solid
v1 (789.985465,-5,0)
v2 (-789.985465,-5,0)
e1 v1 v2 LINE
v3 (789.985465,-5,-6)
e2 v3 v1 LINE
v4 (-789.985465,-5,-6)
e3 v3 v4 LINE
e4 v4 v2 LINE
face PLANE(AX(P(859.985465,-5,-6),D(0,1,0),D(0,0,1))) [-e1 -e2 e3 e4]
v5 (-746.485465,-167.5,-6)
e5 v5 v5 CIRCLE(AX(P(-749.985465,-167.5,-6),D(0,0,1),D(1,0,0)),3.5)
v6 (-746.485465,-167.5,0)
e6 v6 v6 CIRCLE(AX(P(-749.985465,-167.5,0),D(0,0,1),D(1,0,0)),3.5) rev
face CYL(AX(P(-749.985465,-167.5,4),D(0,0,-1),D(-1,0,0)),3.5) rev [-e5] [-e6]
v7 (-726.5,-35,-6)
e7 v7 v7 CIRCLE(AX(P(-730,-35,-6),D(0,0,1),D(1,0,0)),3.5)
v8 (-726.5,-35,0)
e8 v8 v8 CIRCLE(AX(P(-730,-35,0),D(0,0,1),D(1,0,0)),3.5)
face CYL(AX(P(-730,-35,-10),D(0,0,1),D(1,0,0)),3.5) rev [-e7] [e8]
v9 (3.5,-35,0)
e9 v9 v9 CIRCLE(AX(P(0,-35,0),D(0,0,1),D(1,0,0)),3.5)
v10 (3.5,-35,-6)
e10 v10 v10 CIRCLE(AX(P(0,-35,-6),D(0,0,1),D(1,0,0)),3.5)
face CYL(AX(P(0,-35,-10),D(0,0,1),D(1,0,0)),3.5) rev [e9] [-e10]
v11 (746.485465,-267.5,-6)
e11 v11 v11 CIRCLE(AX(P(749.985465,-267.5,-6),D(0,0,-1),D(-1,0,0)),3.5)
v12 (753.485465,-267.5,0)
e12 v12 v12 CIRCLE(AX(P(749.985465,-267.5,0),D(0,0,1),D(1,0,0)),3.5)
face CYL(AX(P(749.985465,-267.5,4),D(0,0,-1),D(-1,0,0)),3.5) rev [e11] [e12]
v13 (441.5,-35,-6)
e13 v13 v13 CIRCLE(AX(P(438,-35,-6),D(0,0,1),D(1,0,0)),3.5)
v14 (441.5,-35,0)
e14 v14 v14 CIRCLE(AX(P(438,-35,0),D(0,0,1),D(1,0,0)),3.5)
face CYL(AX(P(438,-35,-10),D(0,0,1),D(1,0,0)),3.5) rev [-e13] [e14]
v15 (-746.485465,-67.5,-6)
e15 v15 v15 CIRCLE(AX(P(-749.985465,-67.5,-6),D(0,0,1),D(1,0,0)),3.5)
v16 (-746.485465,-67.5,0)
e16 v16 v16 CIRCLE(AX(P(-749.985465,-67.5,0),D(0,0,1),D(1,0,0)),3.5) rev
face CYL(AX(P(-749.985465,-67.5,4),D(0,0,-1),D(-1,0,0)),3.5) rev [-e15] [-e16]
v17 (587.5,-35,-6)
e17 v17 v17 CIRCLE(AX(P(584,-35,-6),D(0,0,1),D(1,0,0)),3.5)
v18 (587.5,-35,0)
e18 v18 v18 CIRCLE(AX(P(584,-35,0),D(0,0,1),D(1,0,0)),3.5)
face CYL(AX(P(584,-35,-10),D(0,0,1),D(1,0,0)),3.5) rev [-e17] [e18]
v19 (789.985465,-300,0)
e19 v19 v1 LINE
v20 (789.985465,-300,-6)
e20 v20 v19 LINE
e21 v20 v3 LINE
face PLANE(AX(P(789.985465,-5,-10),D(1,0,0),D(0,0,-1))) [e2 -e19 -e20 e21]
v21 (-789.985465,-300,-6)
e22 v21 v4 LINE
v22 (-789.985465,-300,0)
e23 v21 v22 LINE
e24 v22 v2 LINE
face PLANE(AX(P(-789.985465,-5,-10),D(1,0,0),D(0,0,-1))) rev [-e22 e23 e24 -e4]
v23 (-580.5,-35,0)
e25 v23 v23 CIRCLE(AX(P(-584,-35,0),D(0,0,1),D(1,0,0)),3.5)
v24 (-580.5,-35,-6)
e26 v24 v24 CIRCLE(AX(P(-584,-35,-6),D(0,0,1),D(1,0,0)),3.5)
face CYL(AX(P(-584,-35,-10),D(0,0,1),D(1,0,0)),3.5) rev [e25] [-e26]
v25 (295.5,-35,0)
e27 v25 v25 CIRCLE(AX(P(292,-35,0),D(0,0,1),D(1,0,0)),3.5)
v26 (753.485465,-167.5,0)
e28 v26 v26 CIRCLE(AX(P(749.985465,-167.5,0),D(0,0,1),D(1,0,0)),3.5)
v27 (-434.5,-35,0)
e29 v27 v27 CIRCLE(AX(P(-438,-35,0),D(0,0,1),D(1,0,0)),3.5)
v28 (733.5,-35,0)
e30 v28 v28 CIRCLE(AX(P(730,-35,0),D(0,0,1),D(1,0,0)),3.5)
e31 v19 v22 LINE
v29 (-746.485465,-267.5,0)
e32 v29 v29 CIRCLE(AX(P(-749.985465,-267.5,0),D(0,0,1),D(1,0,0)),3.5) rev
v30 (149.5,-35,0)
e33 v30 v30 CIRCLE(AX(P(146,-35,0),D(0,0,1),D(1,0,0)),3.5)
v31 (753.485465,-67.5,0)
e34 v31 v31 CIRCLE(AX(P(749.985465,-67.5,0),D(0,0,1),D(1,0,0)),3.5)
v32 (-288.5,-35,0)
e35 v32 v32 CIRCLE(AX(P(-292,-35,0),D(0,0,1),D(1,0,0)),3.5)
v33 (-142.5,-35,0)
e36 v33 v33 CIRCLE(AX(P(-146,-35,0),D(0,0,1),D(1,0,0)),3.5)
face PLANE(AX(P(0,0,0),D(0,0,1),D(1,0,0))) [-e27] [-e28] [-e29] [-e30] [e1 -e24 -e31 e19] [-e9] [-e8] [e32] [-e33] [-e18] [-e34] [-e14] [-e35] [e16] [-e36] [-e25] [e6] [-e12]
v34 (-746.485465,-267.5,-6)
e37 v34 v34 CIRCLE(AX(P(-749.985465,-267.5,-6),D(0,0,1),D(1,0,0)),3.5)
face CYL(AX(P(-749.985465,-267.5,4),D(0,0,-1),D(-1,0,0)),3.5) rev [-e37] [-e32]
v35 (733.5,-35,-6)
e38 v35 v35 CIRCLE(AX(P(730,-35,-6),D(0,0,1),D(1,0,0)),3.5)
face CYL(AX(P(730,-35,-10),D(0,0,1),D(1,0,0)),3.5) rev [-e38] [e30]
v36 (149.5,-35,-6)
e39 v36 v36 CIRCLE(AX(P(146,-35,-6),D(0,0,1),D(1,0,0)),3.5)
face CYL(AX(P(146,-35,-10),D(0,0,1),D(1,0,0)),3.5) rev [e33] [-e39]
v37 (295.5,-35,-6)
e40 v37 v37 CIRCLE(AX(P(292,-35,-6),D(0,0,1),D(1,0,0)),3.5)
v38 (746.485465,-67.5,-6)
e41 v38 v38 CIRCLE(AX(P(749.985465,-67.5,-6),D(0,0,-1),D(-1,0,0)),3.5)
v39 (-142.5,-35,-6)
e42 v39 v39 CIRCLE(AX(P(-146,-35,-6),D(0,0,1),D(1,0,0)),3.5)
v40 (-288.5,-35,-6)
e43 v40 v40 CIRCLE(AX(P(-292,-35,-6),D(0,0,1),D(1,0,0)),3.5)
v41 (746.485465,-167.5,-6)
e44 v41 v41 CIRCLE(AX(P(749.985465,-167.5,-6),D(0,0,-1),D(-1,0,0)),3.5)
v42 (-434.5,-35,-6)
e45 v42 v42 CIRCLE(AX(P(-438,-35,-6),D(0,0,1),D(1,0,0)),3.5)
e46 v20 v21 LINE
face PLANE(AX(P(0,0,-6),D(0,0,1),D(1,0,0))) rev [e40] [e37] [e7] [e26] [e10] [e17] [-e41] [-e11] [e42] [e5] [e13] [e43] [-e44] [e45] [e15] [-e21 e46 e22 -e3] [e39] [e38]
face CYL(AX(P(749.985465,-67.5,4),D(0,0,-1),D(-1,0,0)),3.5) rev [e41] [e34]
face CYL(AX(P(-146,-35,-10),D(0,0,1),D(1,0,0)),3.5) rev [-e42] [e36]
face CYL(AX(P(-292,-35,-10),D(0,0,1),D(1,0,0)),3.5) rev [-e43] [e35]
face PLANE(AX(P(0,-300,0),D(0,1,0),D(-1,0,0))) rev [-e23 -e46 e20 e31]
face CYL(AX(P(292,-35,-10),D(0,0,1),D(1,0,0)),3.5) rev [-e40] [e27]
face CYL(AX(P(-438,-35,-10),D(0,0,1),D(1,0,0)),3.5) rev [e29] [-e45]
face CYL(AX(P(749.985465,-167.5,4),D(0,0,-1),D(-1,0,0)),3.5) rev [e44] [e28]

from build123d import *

# Parameters (mm, degrees)
BASE_FLANGE1_DEPTH      = 6
SKETCH6_W               = 1952.366883789
SKETCH6_H               = 635.232253026
CUT_EXTRUDE1_DEPTH      = 10
CUT_EXTRUDE2_DEPTH      = 10
SKETCH8_R               = 3.5
CUT_EXTRUDE3_DEPTH      = 10
LPATTERN1_COUNT         = 6
LPATTERN1_PITCH         = 146
LPATTERN1_COL_COUNT     = 6
LPATTERN1_COL_PITCH     = 146
SKETCH9_R               = 3.5
CUT_EXTRUDE4_DEPTH      = 10
LPATTERN2_COUNT         = 2
LPATTERN2_PITCH         = 100
LPATTERN2_COL_COUNT     = 2
LPATTERN2_COL_PITCH     = 100
MIRROR2_COPY_1_SKETCH_R = 3.5
MIRROR2_COPY_1_DEPTH    = 10
MIRROR2_COPY_2_SKETCH_R = 3.5
MIRROR2_COPY_2_DEPTH    = 10


# Sheet-metal steps are written as plain solids
with BuildPart() as part:
    # Sketch1 → Base-Flange1 (new body)
    with BuildSketch(Plane.XY):
        with BuildLine():
            Line((859.985464993, -5), (-859.985464993, -5))
            ThreePointArc((-859.985464993, -5), (0, -860), (859.985464993, -5))
        make_face()
    extrude(amount=-BASE_FLANGE1_DEPTH)

    # Sketch6 → Cut-Extrude1 (cut)
    with BuildSketch(Plane.XY):
        with Locations((-97.229426483, -617.616126513)):
            Rectangle(SKETCH6_W, SKETCH6_H)
    extrude(amount=-CUT_EXTRUDE1_DEPTH, mode=Mode.SUBTRACT)

    # Sketch7 → Cut-Extrude2 (cut)
    with BuildSketch(Plane.XY):
        with BuildLine():
            Line((-859.985464993, -5), (-789.985464993, -5))
            Line((-789.985464993, -5), (-789.985464993, -300))
            Line((-789.985464993, -300), (-805.977667184, -300))
            ThreePointArc((-805.977667184, -300), (-845.940033007, -154.872400886), (-859.985464993, -5))
        make_face()
    cut_extrude2 = extrude(amount=-CUT_EXTRUDE2_DEPTH, mode=Mode.SUBTRACT)

    # Mirror1: Cut-Extrude2 across plane
    add(cut_extrude2.mirror(Plane(origin=(0, 0, 0), x_dir=(0, 0, 1), z_dir=(1, 0, 0))), mode=Mode.SUBTRACT)

    # Sketch8 → Cut-Extrude3 (cut)
    with BuildSketch(Plane.XY):
        with Locations((0, -35)):
            Circle(SKETCH8_R)
    cut_extrude3 = extrude(amount=-CUT_EXTRUDE3_DEPTH, mode=Mode.SUBTRACT)

    # LPattern1: Cut-Extrude3 ×6
    with Locations(*[(-i * LPATTERN1_PITCH, 0, 0) for i in range(1, LPATTERN1_COUNT)]):
        add(cut_extrude3, mode=Mode.SUBTRACT)

    # LPattern1 col: Cut-Extrude3 ×6
    with Locations(*[(i * LPATTERN1_COL_PITCH, 0, 0) for i in range(1, LPATTERN1_COL_COUNT)]):
        add(cut_extrude3, mode=Mode.SUBTRACT)

    # Sketch9 → Cut-Extrude4 (cut)
    with BuildSketch(Plane(origin=(0, 0, -6), x_dir=(-1, 0, 0), z_dir=(0, 0, -1))):
        with Locations((-749.985464993, -167.5)):
            Circle(SKETCH9_R)
    cut_extrude4 = extrude(amount=-CUT_EXTRUDE4_DEPTH, mode=Mode.SUBTRACT)

    # LPattern2: Cut-Extrude4 ×2
    with Locations(*[(0, -i * LPATTERN2_PITCH, 0) for i in range(1, LPATTERN2_COUNT)]):
        add(cut_extrude4, mode=Mode.SUBTRACT)

    # LPattern2 col: Cut-Extrude4 ×2
    with Locations(*[(0, i * LPATTERN2_COL_PITCH, 0) for i in range(1, LPATTERN2_COL_COUNT)]):
        add(cut_extrude4, mode=Mode.SUBTRACT)

    # Mirror2: Cut-Extrude4 across plane
    add(cut_extrude4.mirror(Plane(origin=(0, 0, 0), x_dir=(0, 0, 1), z_dir=(1, 0, 0))), mode=Mode.SUBTRACT)

    # Mirror2 copy 1 sketch → Mirror2 copy 1 (cut)
    with BuildSketch(Plane(origin=(0, -100, -6), x_dir=(1, 0, 0), z_dir=(0, 0, -1))):
        with Locations((-749.985464993, 167.5)):
            Circle(MIRROR2_COPY_1_SKETCH_R)
    extrude(amount=-MIRROR2_COPY_1_DEPTH, mode=Mode.SUBTRACT)

    # Mirror2 copy 2 sketch → Mirror2 copy 2 (cut)
    with BuildSketch(Plane(origin=(0, 100, -6), x_dir=(1, 0, 0), z_dir=(0, 0, -1))):
        with Locations((-749.985464993, 167.5)):
            Circle(MIRROR2_COPY_2_SKETCH_R)
    extrude(amount=-MIRROR2_COPY_2_DEPTH, mode=Mode.SUBTRACT)


solid = part.part
